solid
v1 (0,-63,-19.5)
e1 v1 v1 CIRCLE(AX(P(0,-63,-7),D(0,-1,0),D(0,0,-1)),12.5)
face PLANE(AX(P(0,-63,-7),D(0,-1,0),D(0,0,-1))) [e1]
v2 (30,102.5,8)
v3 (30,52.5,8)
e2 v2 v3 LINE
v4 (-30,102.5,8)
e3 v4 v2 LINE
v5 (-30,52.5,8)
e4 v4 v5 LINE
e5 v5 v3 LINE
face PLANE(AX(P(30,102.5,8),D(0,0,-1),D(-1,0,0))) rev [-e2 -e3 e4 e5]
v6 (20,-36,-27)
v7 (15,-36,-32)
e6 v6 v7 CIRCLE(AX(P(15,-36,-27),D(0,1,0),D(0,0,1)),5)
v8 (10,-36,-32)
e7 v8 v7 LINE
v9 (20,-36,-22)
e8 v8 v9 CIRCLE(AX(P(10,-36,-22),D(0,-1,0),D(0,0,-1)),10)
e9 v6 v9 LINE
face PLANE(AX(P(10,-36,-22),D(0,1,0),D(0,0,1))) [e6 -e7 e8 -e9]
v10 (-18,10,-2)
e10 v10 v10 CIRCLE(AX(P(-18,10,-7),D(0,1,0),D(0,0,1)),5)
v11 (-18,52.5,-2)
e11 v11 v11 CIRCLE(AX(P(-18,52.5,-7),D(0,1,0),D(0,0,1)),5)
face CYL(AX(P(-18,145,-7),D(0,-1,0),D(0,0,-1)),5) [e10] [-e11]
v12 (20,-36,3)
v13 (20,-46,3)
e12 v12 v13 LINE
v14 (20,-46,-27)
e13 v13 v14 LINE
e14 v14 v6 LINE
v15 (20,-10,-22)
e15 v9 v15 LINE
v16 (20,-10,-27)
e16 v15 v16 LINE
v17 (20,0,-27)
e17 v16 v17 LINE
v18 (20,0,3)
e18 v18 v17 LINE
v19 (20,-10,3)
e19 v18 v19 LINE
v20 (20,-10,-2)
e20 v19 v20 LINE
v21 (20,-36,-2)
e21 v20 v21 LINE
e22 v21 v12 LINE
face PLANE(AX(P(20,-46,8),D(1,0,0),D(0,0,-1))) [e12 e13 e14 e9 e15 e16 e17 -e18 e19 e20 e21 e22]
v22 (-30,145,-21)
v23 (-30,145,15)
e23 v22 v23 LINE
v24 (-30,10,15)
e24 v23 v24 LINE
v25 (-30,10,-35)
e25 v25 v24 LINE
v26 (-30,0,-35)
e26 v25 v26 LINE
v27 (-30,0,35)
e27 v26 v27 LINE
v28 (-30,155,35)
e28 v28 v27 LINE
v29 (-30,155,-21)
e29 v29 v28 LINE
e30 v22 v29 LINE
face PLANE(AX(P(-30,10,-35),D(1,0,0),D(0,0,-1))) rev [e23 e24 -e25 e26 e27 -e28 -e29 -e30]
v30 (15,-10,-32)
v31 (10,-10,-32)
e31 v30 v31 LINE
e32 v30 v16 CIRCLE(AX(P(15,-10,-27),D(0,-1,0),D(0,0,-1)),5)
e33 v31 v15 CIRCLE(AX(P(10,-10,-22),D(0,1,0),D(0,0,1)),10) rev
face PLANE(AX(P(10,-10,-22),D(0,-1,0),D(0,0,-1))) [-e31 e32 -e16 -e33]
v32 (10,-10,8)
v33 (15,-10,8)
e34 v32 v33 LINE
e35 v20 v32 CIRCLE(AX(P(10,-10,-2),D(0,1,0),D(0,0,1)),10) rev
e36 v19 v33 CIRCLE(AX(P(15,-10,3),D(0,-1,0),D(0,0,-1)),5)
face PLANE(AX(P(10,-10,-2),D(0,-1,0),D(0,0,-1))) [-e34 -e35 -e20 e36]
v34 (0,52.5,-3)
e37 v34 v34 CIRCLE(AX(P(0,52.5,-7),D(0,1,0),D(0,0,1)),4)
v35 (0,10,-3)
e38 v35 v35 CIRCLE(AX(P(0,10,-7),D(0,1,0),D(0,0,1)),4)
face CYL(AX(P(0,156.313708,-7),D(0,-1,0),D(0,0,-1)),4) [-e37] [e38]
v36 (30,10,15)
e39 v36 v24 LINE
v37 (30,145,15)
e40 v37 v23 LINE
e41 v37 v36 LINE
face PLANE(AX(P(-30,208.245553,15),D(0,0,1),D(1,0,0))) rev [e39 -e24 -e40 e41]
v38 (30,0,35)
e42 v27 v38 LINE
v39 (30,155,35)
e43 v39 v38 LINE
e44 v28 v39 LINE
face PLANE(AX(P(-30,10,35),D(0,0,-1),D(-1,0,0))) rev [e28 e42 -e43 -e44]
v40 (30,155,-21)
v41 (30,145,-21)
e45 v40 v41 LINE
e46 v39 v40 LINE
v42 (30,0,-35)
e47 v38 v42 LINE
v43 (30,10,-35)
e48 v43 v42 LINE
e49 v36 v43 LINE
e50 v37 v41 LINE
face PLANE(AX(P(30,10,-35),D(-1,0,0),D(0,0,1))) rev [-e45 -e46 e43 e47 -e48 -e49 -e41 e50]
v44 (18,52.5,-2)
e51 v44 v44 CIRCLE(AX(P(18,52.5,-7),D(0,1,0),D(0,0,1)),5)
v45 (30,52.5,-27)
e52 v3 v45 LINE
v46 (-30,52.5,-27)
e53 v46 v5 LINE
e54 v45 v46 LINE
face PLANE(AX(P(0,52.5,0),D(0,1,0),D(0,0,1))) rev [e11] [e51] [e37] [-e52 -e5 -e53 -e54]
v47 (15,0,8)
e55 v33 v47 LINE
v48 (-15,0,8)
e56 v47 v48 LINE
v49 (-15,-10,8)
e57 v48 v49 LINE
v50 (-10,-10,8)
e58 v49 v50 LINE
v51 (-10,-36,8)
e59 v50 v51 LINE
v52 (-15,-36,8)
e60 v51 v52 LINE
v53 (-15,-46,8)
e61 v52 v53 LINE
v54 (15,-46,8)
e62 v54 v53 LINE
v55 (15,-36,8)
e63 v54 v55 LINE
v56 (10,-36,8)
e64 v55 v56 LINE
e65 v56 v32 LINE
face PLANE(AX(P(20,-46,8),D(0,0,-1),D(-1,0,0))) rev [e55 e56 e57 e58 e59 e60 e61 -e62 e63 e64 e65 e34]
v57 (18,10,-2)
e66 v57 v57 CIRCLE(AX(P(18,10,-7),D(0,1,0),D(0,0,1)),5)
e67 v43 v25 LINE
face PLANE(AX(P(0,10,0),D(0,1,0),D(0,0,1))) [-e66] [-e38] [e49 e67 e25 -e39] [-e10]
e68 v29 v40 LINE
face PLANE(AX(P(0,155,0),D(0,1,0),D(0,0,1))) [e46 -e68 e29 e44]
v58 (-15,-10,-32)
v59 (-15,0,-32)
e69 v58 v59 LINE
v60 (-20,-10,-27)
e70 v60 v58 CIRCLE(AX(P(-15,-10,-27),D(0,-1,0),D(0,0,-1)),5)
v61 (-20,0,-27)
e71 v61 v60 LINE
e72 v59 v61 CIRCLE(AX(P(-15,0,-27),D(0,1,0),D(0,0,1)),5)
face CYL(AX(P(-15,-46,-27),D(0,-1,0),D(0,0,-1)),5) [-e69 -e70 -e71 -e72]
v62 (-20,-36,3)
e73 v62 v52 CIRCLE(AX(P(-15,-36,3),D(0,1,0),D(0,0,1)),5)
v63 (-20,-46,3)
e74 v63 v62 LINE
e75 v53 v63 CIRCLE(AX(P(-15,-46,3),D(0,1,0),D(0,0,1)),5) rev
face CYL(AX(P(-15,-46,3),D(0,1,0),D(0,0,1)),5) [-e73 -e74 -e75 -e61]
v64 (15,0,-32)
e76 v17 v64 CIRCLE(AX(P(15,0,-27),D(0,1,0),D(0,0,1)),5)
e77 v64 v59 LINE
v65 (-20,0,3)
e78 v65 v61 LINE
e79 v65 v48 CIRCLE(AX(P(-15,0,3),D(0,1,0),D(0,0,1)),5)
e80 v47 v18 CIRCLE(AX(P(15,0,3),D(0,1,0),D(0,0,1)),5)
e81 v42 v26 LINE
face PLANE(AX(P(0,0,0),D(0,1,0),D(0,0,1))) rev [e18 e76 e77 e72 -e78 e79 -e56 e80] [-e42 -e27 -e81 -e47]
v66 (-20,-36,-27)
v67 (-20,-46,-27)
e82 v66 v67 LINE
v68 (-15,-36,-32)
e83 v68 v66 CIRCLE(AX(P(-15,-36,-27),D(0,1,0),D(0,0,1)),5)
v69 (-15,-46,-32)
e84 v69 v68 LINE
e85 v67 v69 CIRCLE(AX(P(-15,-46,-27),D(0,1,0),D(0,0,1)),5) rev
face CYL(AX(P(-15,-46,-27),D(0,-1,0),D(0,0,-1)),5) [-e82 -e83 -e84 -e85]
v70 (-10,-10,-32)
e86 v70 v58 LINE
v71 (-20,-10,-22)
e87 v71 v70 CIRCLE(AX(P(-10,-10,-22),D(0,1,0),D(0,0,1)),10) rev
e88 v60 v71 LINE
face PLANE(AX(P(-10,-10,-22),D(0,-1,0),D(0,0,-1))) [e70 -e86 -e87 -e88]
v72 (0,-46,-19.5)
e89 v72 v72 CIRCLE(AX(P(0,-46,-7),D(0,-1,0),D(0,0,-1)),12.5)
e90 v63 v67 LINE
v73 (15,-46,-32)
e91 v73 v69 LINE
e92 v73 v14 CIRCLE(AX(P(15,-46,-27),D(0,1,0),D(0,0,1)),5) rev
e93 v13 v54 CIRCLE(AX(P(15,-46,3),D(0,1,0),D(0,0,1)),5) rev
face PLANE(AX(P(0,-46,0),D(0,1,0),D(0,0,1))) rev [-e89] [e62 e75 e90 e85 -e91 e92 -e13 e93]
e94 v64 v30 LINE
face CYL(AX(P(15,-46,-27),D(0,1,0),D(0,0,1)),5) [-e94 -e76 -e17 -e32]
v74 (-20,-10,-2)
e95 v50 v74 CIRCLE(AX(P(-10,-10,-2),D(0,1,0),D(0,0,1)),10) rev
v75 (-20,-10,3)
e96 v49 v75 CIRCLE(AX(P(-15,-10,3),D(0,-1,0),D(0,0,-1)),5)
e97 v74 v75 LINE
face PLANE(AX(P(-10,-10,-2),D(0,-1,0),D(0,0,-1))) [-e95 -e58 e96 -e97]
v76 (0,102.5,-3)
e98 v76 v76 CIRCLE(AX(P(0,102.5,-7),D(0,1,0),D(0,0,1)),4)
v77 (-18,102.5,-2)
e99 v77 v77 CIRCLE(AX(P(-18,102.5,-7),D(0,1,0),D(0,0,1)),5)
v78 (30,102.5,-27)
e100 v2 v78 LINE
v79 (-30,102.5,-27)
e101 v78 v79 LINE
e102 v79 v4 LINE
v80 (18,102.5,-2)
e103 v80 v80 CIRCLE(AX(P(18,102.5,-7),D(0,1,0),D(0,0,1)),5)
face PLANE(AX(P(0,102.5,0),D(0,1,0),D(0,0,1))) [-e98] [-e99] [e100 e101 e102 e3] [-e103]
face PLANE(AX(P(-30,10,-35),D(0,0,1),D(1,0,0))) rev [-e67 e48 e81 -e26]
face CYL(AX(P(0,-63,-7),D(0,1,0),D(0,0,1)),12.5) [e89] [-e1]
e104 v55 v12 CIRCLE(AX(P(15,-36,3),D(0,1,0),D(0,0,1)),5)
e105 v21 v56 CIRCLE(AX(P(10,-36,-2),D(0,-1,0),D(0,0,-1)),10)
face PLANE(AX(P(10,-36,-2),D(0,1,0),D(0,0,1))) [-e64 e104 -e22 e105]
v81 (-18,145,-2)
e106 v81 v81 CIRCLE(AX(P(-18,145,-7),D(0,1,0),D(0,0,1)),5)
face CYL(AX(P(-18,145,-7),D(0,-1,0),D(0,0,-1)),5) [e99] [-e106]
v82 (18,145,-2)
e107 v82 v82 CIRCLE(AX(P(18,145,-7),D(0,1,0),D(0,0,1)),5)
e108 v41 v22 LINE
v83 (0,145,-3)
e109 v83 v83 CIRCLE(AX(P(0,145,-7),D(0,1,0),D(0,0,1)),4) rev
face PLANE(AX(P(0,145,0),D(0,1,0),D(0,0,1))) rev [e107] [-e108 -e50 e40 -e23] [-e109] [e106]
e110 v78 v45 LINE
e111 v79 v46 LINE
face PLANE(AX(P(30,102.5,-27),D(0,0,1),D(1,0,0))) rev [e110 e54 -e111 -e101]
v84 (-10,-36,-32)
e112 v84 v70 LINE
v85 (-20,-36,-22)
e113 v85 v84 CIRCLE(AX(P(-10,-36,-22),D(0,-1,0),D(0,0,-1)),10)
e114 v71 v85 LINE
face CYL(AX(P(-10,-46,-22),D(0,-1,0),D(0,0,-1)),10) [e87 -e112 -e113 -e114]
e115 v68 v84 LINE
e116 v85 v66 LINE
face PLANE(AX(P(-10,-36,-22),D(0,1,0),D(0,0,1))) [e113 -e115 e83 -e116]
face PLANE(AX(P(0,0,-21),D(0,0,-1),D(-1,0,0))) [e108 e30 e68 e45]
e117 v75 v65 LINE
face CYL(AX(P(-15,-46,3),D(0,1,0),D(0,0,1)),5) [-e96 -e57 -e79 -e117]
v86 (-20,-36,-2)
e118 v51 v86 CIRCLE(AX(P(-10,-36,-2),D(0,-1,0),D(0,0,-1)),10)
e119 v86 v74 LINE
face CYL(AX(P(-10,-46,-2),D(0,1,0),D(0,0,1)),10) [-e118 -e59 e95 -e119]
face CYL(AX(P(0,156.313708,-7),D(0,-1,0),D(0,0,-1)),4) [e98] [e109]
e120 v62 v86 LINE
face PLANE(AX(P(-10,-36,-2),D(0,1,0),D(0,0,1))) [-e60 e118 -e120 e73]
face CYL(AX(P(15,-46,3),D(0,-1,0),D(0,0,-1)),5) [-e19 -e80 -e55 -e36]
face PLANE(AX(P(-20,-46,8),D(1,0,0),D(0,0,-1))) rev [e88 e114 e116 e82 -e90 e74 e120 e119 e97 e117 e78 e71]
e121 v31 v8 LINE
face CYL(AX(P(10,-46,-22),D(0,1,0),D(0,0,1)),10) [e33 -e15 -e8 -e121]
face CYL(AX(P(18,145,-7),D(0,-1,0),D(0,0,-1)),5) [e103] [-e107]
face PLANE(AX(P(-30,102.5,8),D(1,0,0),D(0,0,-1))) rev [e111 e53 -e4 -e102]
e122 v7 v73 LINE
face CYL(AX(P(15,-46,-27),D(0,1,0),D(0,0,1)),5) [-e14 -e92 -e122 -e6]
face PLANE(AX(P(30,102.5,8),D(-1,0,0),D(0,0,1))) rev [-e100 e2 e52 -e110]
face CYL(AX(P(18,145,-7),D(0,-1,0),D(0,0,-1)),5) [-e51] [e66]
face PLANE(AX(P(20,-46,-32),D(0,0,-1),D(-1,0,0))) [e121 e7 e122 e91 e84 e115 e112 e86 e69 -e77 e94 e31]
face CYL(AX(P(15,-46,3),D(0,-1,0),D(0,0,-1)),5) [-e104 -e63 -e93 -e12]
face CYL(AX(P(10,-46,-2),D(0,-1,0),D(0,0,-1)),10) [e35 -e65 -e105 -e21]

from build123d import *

# Parameters (mm, degrees)
SKETCH1_W           = 60
SKETCH1_H           = 70
BOSS_EXTRUDE1_DEPTH = 10
SKETCH2_R           = 5
BOSS_EXTRUDE2_DEPTH = 135
SKETCH3_W           = 60
SKETCH3_H           = 70
BOSS_EXTRUDE3_DEPTH = 10
SKETCH4_R           = 4
BOSS_EXTRUDE4_DEPTH = 135
SKETCH6_W           = 60
SKETCH6_H           = 20
BOSS_EXTRUDE5_DEPTH = 135
SKETCH7_W           = 40
SKETCH7_H           = 40
BOSS_EXTRUDE6_DEPTH = 46
SKETCH8_R           = 12.5
BOSS_EXTRUDE7_DEPTH = 17
FILLET1_START       = -36
FILLET1_DEPTH       = 26
FILLET2_R           = 5
FILLET3_START       = -36
FILLET3_DEPTH       = 26
FILLET4_R           = 5
SKETCH9_W           = 60
SKETCH9_H           = 35
BOSS_EXTRUDE8_DEPTH = 50
SKETCH10_W          = 60
SKETCH10_H          = 10
CUT_EXTRUDE1_DEPTH  = 14


with BuildPart() as part:
    # Sketch1 → Boss-Extrude1 (new body)
    with BuildSketch(Plane(origin=(0, 0, 0), x_dir=(1, 0, 0), z_dir=(0, 1, 0))):
        Rectangle(SKETCH1_W, SKETCH1_H)
    extrude(amount=BOSS_EXTRUDE1_DEPTH)

    # Sketch2 → Boss-Extrude2 (add)
    with BuildSketch(Plane(origin=(0, 10, 0), x_dir=(1, 0, 0), z_dir=(0, 1, 0))):
        with Locations(Location((-18, 7, 0), (0, 0, 270))):
            Circle(SKETCH2_R)
        with Locations(Location((18, 7, 0), (0, 0, 270))):
            Circle(SKETCH2_R)
    extrude(amount=BOSS_EXTRUDE2_DEPTH)

    # Sketch3 → Boss-Extrude3 (add)
    with BuildSketch(Plane(origin=(0, 145, 0), x_dir=(1, 0, 0), z_dir=(0, 1, 0))):
        Rectangle(SKETCH3_W, SKETCH3_H)
    extrude(amount=BOSS_EXTRUDE3_DEPTH)

    # Sketch4 → Boss-Extrude4 (add)
    with BuildSketch(Plane(origin=(0, 10, 0), x_dir=(1, 0, 0), z_dir=(0, 1, 0))):
        with Locations(Location((0, 7, 0), (0, 0, 270))):
            Circle(SKETCH4_R)
    extrude(amount=BOSS_EXTRUDE4_DEPTH)

    # Sketch6 → Boss-Extrude5 (add)
    with BuildSketch(Plane(origin=(0, 10, 0), x_dir=(1, 0, 0), z_dir=(0, 1, 0))):
        with Locations((0, -25)):
            Rectangle(SKETCH6_W, SKETCH6_H)
    extrude(amount=BOSS_EXTRUDE5_DEPTH)

    # Sketch7 → Boss-Extrude6 (add)
    with BuildSketch(Plane.XZ):
        with Locations((0, -12)):
            Rectangle(SKETCH7_W, SKETCH7_H)
    extrude(amount=BOSS_EXTRUDE6_DEPTH)

    # Sketch8 → Boss-Extrude7 (add)
    with BuildSketch(Plane.XZ.offset(46)):
        with Locations(Location((0, -7, 0), (0, 0, 270))):
            Circle(SKETCH8_R)
    extrude(amount=BOSS_EXTRUDE7_DEPTH)

    # Fillet1: read off the stored shape, not the designer's step
    # Fillet1 outline → Fillet1 (cut)
    with BuildSketch(Plane(origin=(0, 0, 0), x_dir=(1, 0, 0), z_dir=(0, 1, 0)).offset(FILLET1_START)):
        with BuildLine():
            Line((-20, 32), (-20, 22))
            ThreePointArc((-20, 22), (-17.071067812, 29.071067812), (-10, 32))
            Line((-10, 32), (-20, 32))
        make_face()
    extrude(amount=FILLET1_DEPTH, mode=Mode.SUBTRACT)

    # Fillet2
    fillet2_edges = [part.edges().sort_by_distance(p)[0] for p in [
        (-20, -41, -32),
        (-20, -5, -32),
    ]]
    fillet(fillet2_edges, radius=FILLET2_R)

    # Fillet3: read off the stored shape, not the designer's step
    # Fillet3 outline → Fillet3 (cut)
    with BuildSketch(Plane(origin=(0, 0, 0), x_dir=(1, 0, 0), z_dir=(0, 1, 0)).offset(FILLET3_START)):
        with BuildLine():
            ThreePointArc((10, 32), (17.071067812, 29.071067812), (20, 22))
            Line((20, 22), (20, 32))
            Line((20, 32), (10, 32))
        make_face()
        with BuildLine():
            ThreePointArc((20, 2), (17.071067812, -5.071067812), (10, -8))
            Line((10, -8), (20, -8))
            Line((20, -8), (20, 2))
        make_face()
        with BuildLine():
            ThreePointArc((-10, -8), (-17.071067812, -5.071067812), (-20, 2))
            Line((-20, 2), (-20, -8))
            Line((-20, -8), (-10, -8))
        make_face()
    extrude(amount=FILLET3_DEPTH, mode=Mode.SUBTRACT)

    # Fillet4
    fillet4_edges = [part.edges().sort_by_distance(p)[0] for p in [
        (20, -41, -32),
        (20, -41, 8),
        (-20, -41, 8),
        (20, -5, 8),
        (20, -5, -32),
        (-20, -5, 8),
    ]]
    fillet(fillet4_edges, radius=FILLET4_R)

    # Sketch9 → Boss-Extrude8 (add)
    with BuildSketch(Plane(origin=(0, 52.5, 0), x_dir=(1, 0, 0), z_dir=(0, 1, 0))):
        with Locations((0, 9.5)):
            Rectangle(SKETCH9_W, SKETCH9_H)
    extrude(amount=BOSS_EXTRUDE8_DEPTH)

    # Sketch10 → Cut-Extrude1 (cut)
    with BuildSketch(Plane(origin=(0, 0, -35), x_dir=(-1, 0, 0), z_dir=(0, 0, -1))):
        with Locations((0, 150)):
            Rectangle(SKETCH10_W, SKETCH10_H)
    extrude(amount=-CUT_EXTRUDE1_DEPTH, mode=Mode.SUBTRACT)


solid = part.part
